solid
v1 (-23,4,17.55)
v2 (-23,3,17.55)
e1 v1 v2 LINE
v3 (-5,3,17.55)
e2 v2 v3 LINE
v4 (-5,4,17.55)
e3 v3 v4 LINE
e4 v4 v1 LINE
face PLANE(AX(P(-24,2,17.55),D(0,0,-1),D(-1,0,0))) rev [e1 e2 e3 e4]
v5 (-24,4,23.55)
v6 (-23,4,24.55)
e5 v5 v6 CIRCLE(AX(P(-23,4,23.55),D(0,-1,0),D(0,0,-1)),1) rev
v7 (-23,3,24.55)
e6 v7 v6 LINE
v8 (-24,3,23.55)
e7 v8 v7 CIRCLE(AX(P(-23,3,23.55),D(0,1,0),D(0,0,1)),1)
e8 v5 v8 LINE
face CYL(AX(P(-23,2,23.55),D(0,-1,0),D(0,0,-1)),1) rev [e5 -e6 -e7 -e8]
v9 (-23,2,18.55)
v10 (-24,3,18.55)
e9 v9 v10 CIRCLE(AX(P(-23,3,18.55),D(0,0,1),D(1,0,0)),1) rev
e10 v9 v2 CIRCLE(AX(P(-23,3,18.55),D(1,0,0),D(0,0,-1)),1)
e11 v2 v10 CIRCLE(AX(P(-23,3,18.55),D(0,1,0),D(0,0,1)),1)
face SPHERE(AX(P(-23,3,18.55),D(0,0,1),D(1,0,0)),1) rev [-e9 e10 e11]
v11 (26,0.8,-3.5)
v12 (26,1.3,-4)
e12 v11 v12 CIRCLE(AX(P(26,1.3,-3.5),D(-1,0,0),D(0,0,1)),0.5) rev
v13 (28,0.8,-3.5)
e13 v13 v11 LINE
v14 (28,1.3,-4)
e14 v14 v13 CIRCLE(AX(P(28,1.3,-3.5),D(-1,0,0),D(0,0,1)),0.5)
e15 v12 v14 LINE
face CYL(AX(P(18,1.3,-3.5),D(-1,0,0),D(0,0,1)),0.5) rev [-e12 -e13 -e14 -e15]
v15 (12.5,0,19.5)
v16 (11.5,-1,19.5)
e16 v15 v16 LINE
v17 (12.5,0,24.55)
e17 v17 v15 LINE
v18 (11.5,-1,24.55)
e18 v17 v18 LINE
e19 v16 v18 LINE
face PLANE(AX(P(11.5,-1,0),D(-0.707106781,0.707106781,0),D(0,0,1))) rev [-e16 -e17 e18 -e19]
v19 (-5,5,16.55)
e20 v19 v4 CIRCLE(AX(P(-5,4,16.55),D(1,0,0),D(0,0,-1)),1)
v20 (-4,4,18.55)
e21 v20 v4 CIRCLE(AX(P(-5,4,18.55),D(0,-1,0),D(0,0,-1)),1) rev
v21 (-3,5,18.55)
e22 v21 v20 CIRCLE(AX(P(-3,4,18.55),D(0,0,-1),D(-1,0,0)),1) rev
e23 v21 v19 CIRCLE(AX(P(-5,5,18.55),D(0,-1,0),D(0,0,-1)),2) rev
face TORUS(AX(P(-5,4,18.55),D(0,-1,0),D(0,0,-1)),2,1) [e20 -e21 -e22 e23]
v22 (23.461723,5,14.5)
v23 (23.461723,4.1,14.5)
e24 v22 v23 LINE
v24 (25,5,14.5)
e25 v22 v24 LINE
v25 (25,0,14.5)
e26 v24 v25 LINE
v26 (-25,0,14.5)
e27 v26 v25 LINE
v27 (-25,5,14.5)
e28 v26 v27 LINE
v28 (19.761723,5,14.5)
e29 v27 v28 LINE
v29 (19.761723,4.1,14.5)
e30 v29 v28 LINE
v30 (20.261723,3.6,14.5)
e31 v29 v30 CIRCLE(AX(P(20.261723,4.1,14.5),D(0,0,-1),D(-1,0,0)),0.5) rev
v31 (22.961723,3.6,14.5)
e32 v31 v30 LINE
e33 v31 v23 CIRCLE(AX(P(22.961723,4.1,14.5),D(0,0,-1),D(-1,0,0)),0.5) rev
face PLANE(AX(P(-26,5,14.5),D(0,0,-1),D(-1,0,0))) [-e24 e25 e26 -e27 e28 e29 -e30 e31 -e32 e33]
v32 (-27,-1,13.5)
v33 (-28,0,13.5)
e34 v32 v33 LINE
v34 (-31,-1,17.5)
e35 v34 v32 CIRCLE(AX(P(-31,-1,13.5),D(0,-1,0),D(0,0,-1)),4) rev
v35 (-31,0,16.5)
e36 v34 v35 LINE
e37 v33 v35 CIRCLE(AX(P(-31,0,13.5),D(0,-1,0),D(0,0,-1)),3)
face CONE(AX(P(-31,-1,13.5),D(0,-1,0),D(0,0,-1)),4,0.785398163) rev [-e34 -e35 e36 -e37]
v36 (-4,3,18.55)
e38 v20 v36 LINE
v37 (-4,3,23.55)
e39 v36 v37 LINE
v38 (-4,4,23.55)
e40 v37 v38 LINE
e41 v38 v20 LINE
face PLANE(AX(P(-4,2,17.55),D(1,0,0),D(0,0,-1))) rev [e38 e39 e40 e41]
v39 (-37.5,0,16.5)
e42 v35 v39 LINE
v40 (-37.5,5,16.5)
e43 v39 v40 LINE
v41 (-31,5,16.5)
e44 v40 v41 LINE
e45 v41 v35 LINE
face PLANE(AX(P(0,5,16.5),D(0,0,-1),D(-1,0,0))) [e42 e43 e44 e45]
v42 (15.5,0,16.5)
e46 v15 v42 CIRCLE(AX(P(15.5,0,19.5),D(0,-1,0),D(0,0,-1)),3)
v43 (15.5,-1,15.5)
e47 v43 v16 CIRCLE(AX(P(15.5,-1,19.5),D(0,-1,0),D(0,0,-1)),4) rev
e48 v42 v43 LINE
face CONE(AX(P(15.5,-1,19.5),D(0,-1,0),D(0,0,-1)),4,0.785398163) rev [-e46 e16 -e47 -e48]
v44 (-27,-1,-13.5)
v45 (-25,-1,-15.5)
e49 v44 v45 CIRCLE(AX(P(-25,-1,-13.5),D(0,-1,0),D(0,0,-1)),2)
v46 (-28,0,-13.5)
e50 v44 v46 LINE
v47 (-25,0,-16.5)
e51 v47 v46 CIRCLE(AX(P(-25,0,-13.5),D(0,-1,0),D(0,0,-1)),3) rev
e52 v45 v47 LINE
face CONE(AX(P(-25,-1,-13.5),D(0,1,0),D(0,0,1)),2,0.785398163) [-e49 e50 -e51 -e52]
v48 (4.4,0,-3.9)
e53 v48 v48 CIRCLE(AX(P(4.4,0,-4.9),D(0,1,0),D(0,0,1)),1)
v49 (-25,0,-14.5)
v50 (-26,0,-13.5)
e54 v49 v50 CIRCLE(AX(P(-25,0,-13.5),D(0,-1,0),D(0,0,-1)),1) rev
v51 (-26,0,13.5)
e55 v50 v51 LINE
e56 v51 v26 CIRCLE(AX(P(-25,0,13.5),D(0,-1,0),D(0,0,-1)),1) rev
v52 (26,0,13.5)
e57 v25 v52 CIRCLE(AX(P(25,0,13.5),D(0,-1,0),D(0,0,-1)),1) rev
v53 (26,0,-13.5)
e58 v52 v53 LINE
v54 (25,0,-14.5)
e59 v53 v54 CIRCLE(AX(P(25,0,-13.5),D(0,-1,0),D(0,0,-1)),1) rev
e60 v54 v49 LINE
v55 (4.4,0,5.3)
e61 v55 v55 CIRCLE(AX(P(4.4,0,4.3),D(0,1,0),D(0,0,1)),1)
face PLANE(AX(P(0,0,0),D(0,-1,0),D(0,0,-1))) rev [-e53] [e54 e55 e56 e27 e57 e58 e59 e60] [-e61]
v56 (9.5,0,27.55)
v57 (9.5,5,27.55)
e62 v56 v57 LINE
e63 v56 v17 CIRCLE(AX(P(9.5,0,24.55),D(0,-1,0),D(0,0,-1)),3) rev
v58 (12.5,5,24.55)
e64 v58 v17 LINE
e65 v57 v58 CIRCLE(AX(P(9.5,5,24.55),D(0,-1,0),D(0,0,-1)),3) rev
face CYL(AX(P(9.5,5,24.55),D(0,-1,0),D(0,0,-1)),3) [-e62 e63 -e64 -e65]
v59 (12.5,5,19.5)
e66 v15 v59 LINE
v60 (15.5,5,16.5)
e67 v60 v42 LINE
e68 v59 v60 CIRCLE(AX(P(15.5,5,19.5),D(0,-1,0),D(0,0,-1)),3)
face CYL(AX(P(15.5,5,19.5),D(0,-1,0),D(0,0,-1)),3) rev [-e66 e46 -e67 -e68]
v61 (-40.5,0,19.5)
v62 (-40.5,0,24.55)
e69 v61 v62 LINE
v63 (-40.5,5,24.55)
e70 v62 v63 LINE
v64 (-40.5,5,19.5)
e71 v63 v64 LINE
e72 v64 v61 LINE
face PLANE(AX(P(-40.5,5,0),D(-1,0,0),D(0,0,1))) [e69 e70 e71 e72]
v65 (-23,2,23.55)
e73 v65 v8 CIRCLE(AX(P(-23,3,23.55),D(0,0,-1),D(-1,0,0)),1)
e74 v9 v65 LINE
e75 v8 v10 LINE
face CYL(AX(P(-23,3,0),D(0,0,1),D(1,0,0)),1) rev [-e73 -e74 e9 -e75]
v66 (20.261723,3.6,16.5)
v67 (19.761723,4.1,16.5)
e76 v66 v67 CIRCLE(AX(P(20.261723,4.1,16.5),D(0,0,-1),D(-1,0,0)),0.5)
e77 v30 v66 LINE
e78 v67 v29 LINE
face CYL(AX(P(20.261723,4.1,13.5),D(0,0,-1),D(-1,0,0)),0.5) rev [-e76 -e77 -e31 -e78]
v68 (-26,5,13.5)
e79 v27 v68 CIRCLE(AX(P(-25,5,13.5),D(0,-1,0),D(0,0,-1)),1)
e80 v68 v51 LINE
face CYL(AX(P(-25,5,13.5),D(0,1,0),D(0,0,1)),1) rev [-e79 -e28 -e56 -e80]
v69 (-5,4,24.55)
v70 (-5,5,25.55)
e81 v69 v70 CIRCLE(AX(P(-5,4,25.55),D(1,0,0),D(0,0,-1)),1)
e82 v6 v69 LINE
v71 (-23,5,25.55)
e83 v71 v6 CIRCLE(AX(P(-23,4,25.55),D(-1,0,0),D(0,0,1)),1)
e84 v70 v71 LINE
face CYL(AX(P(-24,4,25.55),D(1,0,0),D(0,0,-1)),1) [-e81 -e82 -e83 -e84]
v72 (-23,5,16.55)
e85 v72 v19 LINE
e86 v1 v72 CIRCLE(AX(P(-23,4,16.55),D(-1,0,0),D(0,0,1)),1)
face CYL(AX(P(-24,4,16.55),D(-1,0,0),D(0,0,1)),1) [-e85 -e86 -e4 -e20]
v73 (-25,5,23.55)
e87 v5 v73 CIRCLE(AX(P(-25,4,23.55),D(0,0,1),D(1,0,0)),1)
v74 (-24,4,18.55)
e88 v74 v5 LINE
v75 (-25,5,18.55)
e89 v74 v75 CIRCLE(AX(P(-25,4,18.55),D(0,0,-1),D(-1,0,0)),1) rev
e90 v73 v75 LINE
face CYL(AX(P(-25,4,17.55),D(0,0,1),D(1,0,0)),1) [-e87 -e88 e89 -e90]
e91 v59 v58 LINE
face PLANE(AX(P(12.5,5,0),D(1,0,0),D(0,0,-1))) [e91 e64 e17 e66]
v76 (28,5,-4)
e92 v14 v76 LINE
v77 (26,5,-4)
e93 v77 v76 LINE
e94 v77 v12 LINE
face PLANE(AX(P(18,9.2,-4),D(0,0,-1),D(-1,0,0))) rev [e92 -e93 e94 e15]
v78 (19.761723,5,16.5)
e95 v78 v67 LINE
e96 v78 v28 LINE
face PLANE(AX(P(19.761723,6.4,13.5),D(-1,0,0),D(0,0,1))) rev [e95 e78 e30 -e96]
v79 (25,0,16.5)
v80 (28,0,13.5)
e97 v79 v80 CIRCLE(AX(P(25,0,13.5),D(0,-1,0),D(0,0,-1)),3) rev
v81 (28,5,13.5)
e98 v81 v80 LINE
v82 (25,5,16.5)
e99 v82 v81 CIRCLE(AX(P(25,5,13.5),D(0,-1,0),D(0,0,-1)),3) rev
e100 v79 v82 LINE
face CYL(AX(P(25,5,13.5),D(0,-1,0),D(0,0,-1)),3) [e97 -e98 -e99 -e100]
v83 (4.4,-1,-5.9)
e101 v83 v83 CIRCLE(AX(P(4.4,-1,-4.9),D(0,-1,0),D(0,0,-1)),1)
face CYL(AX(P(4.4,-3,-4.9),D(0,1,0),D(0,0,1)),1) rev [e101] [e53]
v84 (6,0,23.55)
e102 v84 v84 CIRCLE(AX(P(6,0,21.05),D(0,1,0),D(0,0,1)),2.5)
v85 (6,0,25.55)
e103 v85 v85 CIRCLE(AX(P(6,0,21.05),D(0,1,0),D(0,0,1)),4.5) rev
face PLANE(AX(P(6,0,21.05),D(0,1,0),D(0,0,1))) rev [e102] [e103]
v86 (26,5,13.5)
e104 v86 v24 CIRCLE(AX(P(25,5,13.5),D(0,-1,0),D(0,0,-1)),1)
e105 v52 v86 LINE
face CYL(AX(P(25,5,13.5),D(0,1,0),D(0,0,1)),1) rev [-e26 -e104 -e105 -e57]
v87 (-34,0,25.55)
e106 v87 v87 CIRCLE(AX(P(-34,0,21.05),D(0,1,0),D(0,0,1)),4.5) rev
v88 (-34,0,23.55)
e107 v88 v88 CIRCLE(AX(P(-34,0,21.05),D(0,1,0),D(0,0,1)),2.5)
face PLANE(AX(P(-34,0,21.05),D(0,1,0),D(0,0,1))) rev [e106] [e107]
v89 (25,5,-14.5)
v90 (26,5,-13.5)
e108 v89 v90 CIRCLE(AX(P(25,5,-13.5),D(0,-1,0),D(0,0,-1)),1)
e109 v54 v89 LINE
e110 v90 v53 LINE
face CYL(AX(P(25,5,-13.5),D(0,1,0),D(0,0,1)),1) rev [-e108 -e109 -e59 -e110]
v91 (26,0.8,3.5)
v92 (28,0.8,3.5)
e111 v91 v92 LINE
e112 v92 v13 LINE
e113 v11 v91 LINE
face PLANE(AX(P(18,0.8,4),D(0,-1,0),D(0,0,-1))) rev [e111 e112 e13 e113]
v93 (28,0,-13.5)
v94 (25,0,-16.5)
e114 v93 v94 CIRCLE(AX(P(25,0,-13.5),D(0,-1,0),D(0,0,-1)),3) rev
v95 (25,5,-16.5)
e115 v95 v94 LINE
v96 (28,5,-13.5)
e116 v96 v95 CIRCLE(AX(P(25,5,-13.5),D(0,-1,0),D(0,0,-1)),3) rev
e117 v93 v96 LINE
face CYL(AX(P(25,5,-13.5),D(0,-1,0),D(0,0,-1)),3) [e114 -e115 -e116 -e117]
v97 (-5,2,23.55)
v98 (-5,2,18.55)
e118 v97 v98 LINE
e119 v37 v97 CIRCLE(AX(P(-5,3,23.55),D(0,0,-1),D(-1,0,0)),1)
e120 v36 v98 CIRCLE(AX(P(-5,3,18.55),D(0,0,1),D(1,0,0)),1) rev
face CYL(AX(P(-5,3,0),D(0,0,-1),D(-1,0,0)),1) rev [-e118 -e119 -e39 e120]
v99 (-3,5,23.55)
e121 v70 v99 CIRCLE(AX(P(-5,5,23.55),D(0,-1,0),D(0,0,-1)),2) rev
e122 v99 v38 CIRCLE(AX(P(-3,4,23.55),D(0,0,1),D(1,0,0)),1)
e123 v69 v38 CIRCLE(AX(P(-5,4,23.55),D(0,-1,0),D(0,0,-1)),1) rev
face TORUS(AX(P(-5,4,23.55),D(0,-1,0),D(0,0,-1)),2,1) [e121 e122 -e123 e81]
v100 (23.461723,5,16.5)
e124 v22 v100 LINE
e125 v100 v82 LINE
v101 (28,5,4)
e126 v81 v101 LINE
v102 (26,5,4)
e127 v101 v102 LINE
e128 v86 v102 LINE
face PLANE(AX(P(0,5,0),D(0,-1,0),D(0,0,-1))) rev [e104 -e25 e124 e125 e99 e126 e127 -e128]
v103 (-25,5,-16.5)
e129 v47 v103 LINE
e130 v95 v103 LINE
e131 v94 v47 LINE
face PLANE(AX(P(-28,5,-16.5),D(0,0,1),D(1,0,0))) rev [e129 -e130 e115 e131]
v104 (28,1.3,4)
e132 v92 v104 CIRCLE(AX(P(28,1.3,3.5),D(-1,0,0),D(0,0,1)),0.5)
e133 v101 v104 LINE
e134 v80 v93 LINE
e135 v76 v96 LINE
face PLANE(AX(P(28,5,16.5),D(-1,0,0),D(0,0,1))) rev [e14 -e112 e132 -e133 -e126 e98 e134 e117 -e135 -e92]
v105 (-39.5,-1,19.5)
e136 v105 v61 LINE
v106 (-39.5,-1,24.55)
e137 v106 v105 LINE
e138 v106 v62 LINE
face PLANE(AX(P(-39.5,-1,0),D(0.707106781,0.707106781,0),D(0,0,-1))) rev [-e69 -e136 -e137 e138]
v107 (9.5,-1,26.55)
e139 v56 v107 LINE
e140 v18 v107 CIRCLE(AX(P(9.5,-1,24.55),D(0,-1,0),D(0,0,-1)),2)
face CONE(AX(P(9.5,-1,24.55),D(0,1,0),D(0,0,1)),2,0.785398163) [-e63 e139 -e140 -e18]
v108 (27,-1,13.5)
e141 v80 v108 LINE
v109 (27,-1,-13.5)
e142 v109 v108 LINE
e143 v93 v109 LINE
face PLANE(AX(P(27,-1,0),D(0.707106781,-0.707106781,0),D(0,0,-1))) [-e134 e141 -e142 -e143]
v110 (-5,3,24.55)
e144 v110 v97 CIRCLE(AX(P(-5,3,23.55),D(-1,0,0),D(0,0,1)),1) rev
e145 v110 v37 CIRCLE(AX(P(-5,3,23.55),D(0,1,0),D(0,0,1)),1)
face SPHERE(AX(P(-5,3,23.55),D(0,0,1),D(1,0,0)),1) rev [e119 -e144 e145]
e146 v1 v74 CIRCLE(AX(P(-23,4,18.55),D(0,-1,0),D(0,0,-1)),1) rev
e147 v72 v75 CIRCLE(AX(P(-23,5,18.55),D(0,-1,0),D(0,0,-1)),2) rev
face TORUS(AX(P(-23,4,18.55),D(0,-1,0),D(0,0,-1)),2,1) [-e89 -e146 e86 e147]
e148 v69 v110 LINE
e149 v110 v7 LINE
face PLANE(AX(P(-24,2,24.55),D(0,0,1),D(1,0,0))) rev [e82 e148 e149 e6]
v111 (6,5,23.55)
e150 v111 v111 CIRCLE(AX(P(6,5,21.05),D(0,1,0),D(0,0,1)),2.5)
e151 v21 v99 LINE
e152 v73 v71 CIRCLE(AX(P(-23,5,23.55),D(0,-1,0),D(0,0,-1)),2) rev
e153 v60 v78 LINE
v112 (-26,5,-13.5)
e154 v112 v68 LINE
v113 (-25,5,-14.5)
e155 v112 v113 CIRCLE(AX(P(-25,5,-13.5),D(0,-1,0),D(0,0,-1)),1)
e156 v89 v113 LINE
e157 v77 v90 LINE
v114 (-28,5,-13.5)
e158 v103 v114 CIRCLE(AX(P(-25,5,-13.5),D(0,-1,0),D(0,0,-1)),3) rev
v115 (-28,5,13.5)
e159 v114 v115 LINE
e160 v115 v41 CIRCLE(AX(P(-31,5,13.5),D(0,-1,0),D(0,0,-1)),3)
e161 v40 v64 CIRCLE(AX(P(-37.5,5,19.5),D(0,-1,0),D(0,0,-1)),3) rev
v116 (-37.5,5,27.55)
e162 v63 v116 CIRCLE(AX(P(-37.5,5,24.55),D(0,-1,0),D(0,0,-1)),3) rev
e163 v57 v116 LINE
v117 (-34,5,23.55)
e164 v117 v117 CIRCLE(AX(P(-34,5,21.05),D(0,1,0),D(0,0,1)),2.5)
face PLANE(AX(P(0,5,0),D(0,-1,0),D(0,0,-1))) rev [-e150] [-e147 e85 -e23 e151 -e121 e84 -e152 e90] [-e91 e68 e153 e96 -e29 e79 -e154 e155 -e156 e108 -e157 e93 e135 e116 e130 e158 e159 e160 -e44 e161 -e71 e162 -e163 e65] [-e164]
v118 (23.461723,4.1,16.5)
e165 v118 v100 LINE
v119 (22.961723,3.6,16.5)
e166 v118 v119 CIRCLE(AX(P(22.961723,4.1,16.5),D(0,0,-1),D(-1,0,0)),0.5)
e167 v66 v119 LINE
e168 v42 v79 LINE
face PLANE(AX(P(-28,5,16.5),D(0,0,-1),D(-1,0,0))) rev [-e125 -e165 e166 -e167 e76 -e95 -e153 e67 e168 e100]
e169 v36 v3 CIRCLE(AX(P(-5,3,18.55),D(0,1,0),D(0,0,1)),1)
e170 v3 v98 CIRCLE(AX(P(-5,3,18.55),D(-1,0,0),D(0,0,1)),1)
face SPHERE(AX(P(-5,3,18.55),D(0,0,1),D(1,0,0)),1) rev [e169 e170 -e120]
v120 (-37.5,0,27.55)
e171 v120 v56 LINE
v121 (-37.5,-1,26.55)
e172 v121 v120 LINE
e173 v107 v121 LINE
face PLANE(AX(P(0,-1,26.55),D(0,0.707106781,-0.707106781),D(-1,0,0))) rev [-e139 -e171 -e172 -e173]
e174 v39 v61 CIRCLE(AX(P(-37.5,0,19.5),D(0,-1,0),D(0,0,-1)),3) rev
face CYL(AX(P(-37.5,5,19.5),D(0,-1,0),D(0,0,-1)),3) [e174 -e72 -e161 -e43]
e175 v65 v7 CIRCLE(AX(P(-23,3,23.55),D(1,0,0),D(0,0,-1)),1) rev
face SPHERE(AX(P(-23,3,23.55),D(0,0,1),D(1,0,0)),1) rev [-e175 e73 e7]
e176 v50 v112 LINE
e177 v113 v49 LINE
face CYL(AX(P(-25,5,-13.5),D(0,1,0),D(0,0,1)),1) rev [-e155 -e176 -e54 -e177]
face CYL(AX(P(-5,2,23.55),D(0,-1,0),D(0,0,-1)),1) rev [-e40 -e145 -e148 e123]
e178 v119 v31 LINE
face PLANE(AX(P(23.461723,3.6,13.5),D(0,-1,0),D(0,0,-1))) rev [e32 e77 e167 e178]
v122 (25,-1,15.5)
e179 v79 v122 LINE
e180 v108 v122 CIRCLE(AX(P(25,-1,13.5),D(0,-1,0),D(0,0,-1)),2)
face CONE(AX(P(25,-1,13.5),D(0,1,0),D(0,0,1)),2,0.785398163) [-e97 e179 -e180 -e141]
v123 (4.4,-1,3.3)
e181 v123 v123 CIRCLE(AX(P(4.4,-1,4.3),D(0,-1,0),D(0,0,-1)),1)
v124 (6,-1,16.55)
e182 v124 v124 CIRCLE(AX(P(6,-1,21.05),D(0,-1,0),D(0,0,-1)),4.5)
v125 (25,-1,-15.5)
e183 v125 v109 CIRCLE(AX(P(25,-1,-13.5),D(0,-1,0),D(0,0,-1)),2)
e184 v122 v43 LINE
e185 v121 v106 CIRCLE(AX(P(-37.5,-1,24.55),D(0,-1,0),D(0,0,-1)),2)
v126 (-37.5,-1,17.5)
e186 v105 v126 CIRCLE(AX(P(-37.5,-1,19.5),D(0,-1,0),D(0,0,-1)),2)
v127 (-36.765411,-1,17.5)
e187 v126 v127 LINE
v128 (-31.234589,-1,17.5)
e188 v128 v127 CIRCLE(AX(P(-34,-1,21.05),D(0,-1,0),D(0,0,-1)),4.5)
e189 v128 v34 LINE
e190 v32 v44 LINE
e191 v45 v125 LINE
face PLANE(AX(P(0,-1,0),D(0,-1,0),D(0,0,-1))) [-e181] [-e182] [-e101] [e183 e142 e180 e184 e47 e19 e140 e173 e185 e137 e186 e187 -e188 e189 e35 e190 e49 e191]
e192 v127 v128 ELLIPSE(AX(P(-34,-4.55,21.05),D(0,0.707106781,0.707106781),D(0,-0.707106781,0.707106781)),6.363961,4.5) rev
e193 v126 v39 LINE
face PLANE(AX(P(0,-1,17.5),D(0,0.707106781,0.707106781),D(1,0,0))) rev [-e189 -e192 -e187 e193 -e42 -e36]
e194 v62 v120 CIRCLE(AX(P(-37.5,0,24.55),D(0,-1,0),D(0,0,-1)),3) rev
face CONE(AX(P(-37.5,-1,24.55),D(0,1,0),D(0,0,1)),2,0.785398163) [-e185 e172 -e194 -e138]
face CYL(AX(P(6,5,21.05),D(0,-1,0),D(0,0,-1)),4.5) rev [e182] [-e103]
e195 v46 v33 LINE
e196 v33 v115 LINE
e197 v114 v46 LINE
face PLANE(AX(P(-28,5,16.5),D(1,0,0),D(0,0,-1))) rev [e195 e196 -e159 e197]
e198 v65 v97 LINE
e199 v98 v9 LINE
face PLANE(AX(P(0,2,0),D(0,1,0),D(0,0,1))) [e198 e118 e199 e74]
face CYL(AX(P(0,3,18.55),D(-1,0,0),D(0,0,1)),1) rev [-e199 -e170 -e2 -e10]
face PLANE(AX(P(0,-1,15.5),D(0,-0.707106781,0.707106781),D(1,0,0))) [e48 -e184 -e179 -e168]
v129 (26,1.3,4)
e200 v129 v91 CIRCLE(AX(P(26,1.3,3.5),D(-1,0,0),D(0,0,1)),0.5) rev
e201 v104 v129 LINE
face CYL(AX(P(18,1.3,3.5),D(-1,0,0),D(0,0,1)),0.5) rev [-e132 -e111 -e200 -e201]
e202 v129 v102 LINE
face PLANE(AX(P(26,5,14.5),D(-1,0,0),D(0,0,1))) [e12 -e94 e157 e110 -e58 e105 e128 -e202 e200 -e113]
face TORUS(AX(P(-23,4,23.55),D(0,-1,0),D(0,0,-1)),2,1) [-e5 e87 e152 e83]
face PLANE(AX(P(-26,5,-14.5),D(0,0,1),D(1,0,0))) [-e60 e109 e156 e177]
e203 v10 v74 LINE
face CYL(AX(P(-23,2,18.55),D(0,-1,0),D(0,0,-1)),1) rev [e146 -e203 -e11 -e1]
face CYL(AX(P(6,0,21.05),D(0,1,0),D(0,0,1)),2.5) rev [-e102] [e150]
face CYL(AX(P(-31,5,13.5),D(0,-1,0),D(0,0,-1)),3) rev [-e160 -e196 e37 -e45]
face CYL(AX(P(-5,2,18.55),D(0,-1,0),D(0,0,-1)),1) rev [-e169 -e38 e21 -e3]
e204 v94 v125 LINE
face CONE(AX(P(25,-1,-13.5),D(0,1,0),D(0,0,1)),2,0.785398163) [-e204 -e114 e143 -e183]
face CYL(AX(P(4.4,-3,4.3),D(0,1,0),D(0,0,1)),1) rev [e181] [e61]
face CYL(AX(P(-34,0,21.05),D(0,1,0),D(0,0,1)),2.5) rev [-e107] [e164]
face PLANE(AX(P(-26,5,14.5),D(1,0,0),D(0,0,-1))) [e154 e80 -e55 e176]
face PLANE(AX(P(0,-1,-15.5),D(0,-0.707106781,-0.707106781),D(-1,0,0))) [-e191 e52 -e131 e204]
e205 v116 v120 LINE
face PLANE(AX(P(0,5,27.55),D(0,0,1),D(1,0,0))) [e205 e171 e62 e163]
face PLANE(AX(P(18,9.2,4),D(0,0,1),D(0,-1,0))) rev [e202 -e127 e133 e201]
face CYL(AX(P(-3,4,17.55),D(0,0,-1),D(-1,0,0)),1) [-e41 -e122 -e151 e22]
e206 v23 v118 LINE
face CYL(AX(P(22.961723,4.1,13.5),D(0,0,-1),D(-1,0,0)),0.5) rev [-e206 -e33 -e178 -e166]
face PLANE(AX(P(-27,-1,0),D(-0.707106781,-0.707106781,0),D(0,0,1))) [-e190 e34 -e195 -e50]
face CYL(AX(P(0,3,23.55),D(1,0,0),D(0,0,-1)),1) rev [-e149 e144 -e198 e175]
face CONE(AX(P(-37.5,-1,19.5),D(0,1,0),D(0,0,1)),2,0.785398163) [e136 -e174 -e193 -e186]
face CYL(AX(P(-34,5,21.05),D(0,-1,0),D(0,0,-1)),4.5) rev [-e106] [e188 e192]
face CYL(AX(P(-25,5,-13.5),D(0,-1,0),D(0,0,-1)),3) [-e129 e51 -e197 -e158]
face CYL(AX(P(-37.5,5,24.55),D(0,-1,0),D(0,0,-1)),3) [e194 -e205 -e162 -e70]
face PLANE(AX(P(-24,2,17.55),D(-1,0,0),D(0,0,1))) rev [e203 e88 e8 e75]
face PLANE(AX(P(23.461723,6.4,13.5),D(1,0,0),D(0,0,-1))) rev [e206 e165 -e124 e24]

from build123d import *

# Parameters (mm, degrees)
SKETCH1_W           = 56
SKETCH1_H           = 33
SKETCH1_W_2         = 52
SKETCH1_H_2         = 29
BOSS_EXTRUDE1_DEPTH = 5
SKETCH2_W           = 56
SKETCH2_H           = 33
BOSS_EXTRUDE2_DEPTH = 1
FILLET1_R           = 3
FILLET2_R           = 1
SKETCH3_W           = 8
SKETCH3_H           = 8.4
CUT_EXTRUDE1_DEPTH  = 10
SKETCH9_W           = 3.7
SKETCH9_H           = 2.8
CUT_EXTRUDE4_DEPTH  = 3
BOSS_EXTRUDE6_START = -6
SKETCH5_R           = 4.5
BOSS_EXTRUDE6_DEPTH = 6
SKETCH7_R           = 4.5
SKETCH7_R_2         = 2.5
BOSS_EXTRUDE7_DEPTH = 5
FILLET4_R           = 3
SKETCH8_W           = 20
SKETCH8_H           = 7
CUT_EXTRUDE3_DEPTH  = 3
FILLET5_R           = 1
CHAMFER2_SIZE       = 1
FILLET6_R           = 0.5
SKETCH10_R          = 1
CUT_EXTRUDE5_DEPTH  = 3


with BuildPart() as part:
    # Sketch1 → Boss-Extrude1 (new body)
    with BuildSketch(Plane(origin=(0, 0, 0), x_dir=(1, 0, 0), z_dir=(0, 1, 0))):
        Rectangle(SKETCH1_W, SKETCH1_H)
        Rectangle(SKETCH1_W_2, SKETCH1_H_2, mode=Mode.SUBTRACT)
    extrude(amount=BOSS_EXTRUDE1_DEPTH)

    # Sketch2 → Boss-Extrude2 (add)
    with BuildSketch(Plane.XZ):
        Rectangle(SKETCH2_W, SKETCH2_H)
    extrude(amount=BOSS_EXTRUDE2_DEPTH)

    # Fillet1
    fillet1_edges = [part.edges().sort_by_distance(p)[0] for p in [
        (-28, 2, -16.5),
        (28, 2, -16.5),
        (28, 2, 16.5),
        (-28, 2, 16.5),
    ]]
    fillet(fillet1_edges, radius=FILLET1_R)

    # Fillet2
    fillet2_edges = [part.edges().sort_by_distance(p)[0] for p in [
        (26, 2.5, 14.5),
        (26, 2.5, -14.5),
        (-26, 2.5, -14.5),
        (-26, 2.5, 14.5),
    ]]
    fillet(fillet2_edges, radius=FILLET2_R)

    # Sketch3 → Cut-Extrude1 (cut)
    with BuildSketch(Plane(origin=(28, 0, 0), x_dir=(0, 0, -1), z_dir=(1, 0, 0))):
        with Locations((0, 5)):
            Rectangle(SKETCH3_W, SKETCH3_H)
    extrude(amount=-CUT_EXTRUDE1_DEPTH, mode=Mode.SUBTRACT)

    # Sketch9 → Cut-Extrude4 (cut)
    with BuildSketch(Plane.XY.offset(16.5)):
        with Locations((21.611723176, 5)):
            Rectangle(SKETCH9_W, SKETCH9_H)
    extrude(amount=-CUT_EXTRUDE4_DEPTH, mode=Mode.SUBTRACT)

    # Sketch5 → Boss-Extrude6 (add)
    # profile 1 of 3: a face of its own
    with BuildSketch(Plane.XZ.offset(1).offset(BOSS_EXTRUDE6_START)):
        Polygon((-25, 16.5), (12.5, 16.5), (12.5, 27.55), (-40.5, 27.55), (-40.5, 16.5), (-28, 16.5), align=None)
        with Locations(Location((-34, 21.05, 0), (0, 0, 270))):
            Circle(SKETCH5_R, mode=Mode.SUBTRACT)
        with Locations(Location((6, 21.05, 0), (0, 0, 270))):
            Circle(SKETCH5_R, mode=Mode.SUBTRACT)
    # profile 2 of 3: a face of its own
    with BuildSketch(Plane.XZ.offset(1).offset(BOSS_EXTRUDE6_START)):
        with BuildLine():
            ThreePointArc((-27.252149964, 15.481872988), (-26.2357955, 16.233643993), (-25, 16.5))
            Line((-25, 16.5), (-28, 16.5))
            Line((-28, 16.5), (-28, 15.481872988))
            Line((-28, 15.481872988), (-27.252149964, 15.481872988))
        make_face()
    # profile 3 of 3: a face of its own
    with BuildSketch(Plane.XZ.offset(1).offset(BOSS_EXTRUDE6_START)):
        with BuildLine():
            ThreePointArc((-28, 13.5), (-27.806817583, 14.559138826), (-27.252149964, 15.481872988))
            Line((-27.252149964, 15.481872988), (-28, 15.481872988))
            Line((-28, 15.481872988), (-28, 13.5))
        make_face()
    extrude(amount=BOSS_EXTRUDE6_DEPTH)

    # Sketch7 → Boss-Extrude7 (add)
    # profile 1 of 2: a face of its own
    with BuildSketch(Plane(origin=(0, 5, 0), x_dir=(1, 0, 0), z_dir=(0, 1, 0))):
        with Locations(Location((6, -21.05, 0), (0, 0, 90))):
            Circle(SKETCH7_R)
        with Locations(Location((6, -21.05, 0), (0, 0, 270))):
            Circle(SKETCH7_R_2, mode=Mode.SUBTRACT)
    # profile 2 of 2: a face of its own
    with BuildSketch(Plane(origin=(0, 5, 0), x_dir=(1, 0, 0), z_dir=(0, 1, 0))):
        with Locations(Location((-34, -21.05, 0), (0, 0, 90))):
            Circle(SKETCH7_R)
        with Locations(Location((-34, -21.05, 0), (0, 0, 270))):
            Circle(SKETCH7_R_2, mode=Mode.SUBTRACT)
    extrude(amount=-BOSS_EXTRUDE7_DEPTH)

    # Fillet4
    fillet4_edges = [part.edges().sort_by_distance(p)[0] for p in [
        (-40.5, 2, 16.5),
        (-40.5, 2, 27.55),
        (12.5, 2, 27.55),
        (12.5, 2, 16.5),
        (-28, 2, 16.5),
    ]]
    fillet(fillet4_edges, radius=FILLET4_R)

    # Sketch8 → Cut-Extrude3 (cut)
    with BuildSketch(Plane(origin=(0, 5, 0), x_dir=(1, 0, 0), z_dir=(0, 1, 0))):
        with Locations((-14, -21.05)):
            Rectangle(SKETCH8_W, SKETCH8_H)
    extrude(amount=-CUT_EXTRUDE3_DEPTH, mode=Mode.SUBTRACT)

    # Fillet5
    fillet5_edges = [part.edges().sort_by_distance(p)[0] for p in [
        (-4, 2, 21.05),
        (-4, 3.5, 17.55),
        (-14, 2, 24.55),
        (-4, 3.5, 24.55),
        (-24, 2, 21.05),
        (-24, 3.5, 24.55),
        (-14, 2, 17.55),
        (-24, 3.5, 17.55),
        (-4, 5, 21.05),
        (-14, 5, 17.55),
        (-24, 5, 21.05),
        (-14, 5, 24.55),
    ]]
    fillet(fillet5_edges, radius=FILLET5_R)

    # Chamfer2
    # the kernel refuses this chamfer: 1 mm, written as the material it takes off along each edge
    with BuildSketch(Plane(origin=(12.5, -1, 19.5), x_dir=(0.02749587661058563, 0.9996219169112968, 0), z_dir=(0, 0, 1)), Plane(origin=(-40.5, -1, 24.55), x_dir=(-0.02749587661058908, 0.9996219169112968, 0), z_dir=(0, 0, -1))) as chamfer2_piece_1:
        Polygon((CHAMFER2_SIZE * 0.999621916911, CHAMFER2_SIZE * 0.0274958766106), (-CHAMFER2_SIZE * 0.0274958766106, CHAMFER2_SIZE * 0.999621916911), (0, 0), align=None)
    extrude(amount=5.05, mode=Mode.SUBTRACT)
    with BuildSketch(Plane(origin=(9.5, -1, 27.55), x_dir=(0, 0.9996219169112968, 0.02749587661058563), z_dir=(-1, 0, 0))) as chamfer2_piece_2:
        Polygon((CHAMFER2_SIZE * 0.999621916911, CHAMFER2_SIZE * 0.0274958766106), (-CHAMFER2_SIZE * 0.0274958766106, CHAMFER2_SIZE * 0.999621916911), (0, 0), align=None)
    extrude(amount=47, mode=Mode.SUBTRACT)
    with BuildSketch(Plane(origin=(-31, -1, 16.5), x_dir=(0, 0.9996219169112968, -0.02749587661058563), z_dir=(-1, 0, 0))) as chamfer2_piece_3:
        Polygon((CHAMFER2_SIZE * 0.999621916911, -CHAMFER2_SIZE * 0.0274958766106), (-CHAMFER2_SIZE * 0.0274958766106, -CHAMFER2_SIZE * 0.999621916911), (0, 0), align=None)
    extrude(amount=6.5, mode=Mode.SUBTRACT)
    with BuildSketch(Plane(origin=(-28, -1, -13.5), x_dir=(-0.02749587661058563, 0.9996219169112968, 0), z_dir=(0, 0, 1))) as chamfer2_piece_4:
        Polygon((CHAMFER2_SIZE * 0.999621916911, -CHAMFER2_SIZE * 0.0274958766106), (-CHAMFER2_SIZE * 0.0274958766106, -CHAMFER2_SIZE * 0.999621916911), (0, 0), align=None)
    extrude(amount=27, mode=Mode.SUBTRACT)
    with BuildSketch(Plane(origin=(-37.5, -1, 19.5), x_dir=(-1, 0, 0), z_dir=(0, 0, 1))) as chamfer2_piece_5:
        Polygon((3, -CHAMFER2_SIZE), (3 - CHAMFER2_SIZE, 0), (3, 0), align=None)
    revolve(axis=Axis((-37.5, -1, 19.5), (0, -1, 0)), revolution_arc=90, mode=Mode.SUBTRACT)
    with BuildSketch(Plane(origin=(-37.5, -1, 24.55), x_dir=(0, 0, 1), z_dir=(1, 0, 0))) as chamfer2_piece_6:
        Polygon((3, -CHAMFER2_SIZE), (3 - CHAMFER2_SIZE, 0), (3, 0), align=None)
    revolve(axis=Axis((-37.5, -1, 24.55), (0, -1, 0)), revolution_arc=90, mode=Mode.SUBTRACT)
    with BuildSketch(Plane(origin=(9.5, -1, 24.55), x_dir=(1, 0, 0), z_dir=(0, 0, -1))) as chamfer2_piece_7:
        Polygon((3, -CHAMFER2_SIZE), (3 - CHAMFER2_SIZE, 0), (3, 0), align=None)
    revolve(axis=Axis((9.5, -1, 24.55), (0, -1, 0)), revolution_arc=90, mode=Mode.SUBTRACT)
    with BuildSketch(Plane(origin=(15.5, -1, 19.5), x_dir=(0, 0, -1), z_dir=(1, 0, 0))) as chamfer2_piece_8:
        Polygon((3, CHAMFER2_SIZE), (3 + CHAMFER2_SIZE, 0), (3, 0), align=None)
    revolve(axis=Axis((15.5, -1, 19.5), (0, 1, 0)), revolution_arc=90, mode=Mode.SUBTRACT)
    with BuildSketch(Plane(origin=(-31, -1, 13.5), x_dir=(0, 0, 1), z_dir=(-1, 0, 0))) as chamfer2_piece_9:
        Polygon((3, CHAMFER2_SIZE), (3 + CHAMFER2_SIZE, 0), (3, 0), align=None)
    revolve(axis=Axis((-31, -1, 13.5), (0, 1, 0)), revolution_arc=90, mode=Mode.SUBTRACT)
    with BuildSketch(Plane(origin=(28, -1, -13.5), x_dir=(0.02749587661058563, 0.9996219169112968, 0), z_dir=(0, 0, 1))) as chamfer2_piece_10:
        Polygon((CHAMFER2_SIZE * 0.999621916911, CHAMFER2_SIZE * 0.0274958766106), (-CHAMFER2_SIZE * 0.0274958766106, CHAMFER2_SIZE * 0.999621916911), (0, 0), align=None)
    extrude(amount=27, mode=Mode.SUBTRACT)
    with BuildSketch(Plane(origin=(25, -1, 16.5), x_dir=(0, 0.9996219169112968, 0.02749587661058563), z_dir=(-1, 0, 0))) as chamfer2_piece_11:
        Polygon((CHAMFER2_SIZE * 0.999621916911, CHAMFER2_SIZE * 0.0274958766106), (-CHAMFER2_SIZE * 0.0274958766106, CHAMFER2_SIZE * 0.999621916911), (0, 0), align=None)
    extrude(amount=9.5, mode=Mode.SUBTRACT)
    with BuildSketch(Plane(origin=(-25, -1, -16.5), x_dir=(0, 0.9996219169112968, -0.02749587661058563), z_dir=(1, 0, 0))) as chamfer2_piece_12:
        Polygon((CHAMFER2_SIZE * 0.999621916911, CHAMFER2_SIZE * 0.0274958766106), (-CHAMFER2_SIZE * 0.0274958766106, CHAMFER2_SIZE * 0.999621916911), (0, 0), align=None)
    extrude(amount=50, mode=Mode.SUBTRACT)
    with BuildSketch(Plane(origin=(-25, -1, -13.5), x_dir=(0, 0, -1), z_dir=(1, 0, 0))) as chamfer2_piece_13:
        Polygon((3, CHAMFER2_SIZE), (3 - CHAMFER2_SIZE, 0), (3, 0), align=None)
    revolve(axis=Axis((-25, -1, -13.5), (0, 1, 0)), revolution_arc=90, mode=Mode.SUBTRACT)
    with BuildSketch(Plane(origin=(25, -1, -13.5), x_dir=(0, 0, -1), z_dir=(-1, 0, 0))) as chamfer2_piece_14:
        Polygon((3, -CHAMFER2_SIZE), (3 - CHAMFER2_SIZE, 0), (3, 0), align=None)
    revolve(axis=Axis((25, -1, -13.5), (0, -1, 0)), revolution_arc=90, mode=Mode.SUBTRACT)
    with BuildSketch(Plane(origin=(25, -1, 13.5), x_dir=(0, 0, 1), z_dir=(-1, 0, 0))) as chamfer2_piece_15:
        Polygon((3 - CHAMFER2_SIZE, 0), (3, CHAMFER2_SIZE), (3, 0), align=None)
    revolve(axis=Axis((25, -1, 13.5), (0, 1, 0)), revolution_arc=90, mode=Mode.SUBTRACT)

    # Fillet6
    fillet6_edges = [part.edges().sort_by_distance(p)[0] for p in [
        (27, 0.8, -4),
        (19.761723176, 3.6, 15.5),
        (23.461723176, 3.6, 15.5),
        (27, 0.8, 4),
    ]]
    fillet(fillet6_edges, radius=FILLET6_R)

    # Sketch10 → Cut-Extrude5 (cut)
    with BuildSketch(Plane(origin=(0, 0, 0), x_dir=(1, 0, 0), z_dir=(0, 1, 0))):
        with Locations(Location((4.4, 4.9, 0), (0, 0, 270))):
            Circle(SKETCH10_R)
        with Locations(Location((4.4, -4.3, 0), (0, 0, 270))):
            Circle(SKETCH10_R)
    extrude(amount=-CUT_EXTRUDE5_DEPTH, mode=Mode.SUBTRACT)


solid = part.part
